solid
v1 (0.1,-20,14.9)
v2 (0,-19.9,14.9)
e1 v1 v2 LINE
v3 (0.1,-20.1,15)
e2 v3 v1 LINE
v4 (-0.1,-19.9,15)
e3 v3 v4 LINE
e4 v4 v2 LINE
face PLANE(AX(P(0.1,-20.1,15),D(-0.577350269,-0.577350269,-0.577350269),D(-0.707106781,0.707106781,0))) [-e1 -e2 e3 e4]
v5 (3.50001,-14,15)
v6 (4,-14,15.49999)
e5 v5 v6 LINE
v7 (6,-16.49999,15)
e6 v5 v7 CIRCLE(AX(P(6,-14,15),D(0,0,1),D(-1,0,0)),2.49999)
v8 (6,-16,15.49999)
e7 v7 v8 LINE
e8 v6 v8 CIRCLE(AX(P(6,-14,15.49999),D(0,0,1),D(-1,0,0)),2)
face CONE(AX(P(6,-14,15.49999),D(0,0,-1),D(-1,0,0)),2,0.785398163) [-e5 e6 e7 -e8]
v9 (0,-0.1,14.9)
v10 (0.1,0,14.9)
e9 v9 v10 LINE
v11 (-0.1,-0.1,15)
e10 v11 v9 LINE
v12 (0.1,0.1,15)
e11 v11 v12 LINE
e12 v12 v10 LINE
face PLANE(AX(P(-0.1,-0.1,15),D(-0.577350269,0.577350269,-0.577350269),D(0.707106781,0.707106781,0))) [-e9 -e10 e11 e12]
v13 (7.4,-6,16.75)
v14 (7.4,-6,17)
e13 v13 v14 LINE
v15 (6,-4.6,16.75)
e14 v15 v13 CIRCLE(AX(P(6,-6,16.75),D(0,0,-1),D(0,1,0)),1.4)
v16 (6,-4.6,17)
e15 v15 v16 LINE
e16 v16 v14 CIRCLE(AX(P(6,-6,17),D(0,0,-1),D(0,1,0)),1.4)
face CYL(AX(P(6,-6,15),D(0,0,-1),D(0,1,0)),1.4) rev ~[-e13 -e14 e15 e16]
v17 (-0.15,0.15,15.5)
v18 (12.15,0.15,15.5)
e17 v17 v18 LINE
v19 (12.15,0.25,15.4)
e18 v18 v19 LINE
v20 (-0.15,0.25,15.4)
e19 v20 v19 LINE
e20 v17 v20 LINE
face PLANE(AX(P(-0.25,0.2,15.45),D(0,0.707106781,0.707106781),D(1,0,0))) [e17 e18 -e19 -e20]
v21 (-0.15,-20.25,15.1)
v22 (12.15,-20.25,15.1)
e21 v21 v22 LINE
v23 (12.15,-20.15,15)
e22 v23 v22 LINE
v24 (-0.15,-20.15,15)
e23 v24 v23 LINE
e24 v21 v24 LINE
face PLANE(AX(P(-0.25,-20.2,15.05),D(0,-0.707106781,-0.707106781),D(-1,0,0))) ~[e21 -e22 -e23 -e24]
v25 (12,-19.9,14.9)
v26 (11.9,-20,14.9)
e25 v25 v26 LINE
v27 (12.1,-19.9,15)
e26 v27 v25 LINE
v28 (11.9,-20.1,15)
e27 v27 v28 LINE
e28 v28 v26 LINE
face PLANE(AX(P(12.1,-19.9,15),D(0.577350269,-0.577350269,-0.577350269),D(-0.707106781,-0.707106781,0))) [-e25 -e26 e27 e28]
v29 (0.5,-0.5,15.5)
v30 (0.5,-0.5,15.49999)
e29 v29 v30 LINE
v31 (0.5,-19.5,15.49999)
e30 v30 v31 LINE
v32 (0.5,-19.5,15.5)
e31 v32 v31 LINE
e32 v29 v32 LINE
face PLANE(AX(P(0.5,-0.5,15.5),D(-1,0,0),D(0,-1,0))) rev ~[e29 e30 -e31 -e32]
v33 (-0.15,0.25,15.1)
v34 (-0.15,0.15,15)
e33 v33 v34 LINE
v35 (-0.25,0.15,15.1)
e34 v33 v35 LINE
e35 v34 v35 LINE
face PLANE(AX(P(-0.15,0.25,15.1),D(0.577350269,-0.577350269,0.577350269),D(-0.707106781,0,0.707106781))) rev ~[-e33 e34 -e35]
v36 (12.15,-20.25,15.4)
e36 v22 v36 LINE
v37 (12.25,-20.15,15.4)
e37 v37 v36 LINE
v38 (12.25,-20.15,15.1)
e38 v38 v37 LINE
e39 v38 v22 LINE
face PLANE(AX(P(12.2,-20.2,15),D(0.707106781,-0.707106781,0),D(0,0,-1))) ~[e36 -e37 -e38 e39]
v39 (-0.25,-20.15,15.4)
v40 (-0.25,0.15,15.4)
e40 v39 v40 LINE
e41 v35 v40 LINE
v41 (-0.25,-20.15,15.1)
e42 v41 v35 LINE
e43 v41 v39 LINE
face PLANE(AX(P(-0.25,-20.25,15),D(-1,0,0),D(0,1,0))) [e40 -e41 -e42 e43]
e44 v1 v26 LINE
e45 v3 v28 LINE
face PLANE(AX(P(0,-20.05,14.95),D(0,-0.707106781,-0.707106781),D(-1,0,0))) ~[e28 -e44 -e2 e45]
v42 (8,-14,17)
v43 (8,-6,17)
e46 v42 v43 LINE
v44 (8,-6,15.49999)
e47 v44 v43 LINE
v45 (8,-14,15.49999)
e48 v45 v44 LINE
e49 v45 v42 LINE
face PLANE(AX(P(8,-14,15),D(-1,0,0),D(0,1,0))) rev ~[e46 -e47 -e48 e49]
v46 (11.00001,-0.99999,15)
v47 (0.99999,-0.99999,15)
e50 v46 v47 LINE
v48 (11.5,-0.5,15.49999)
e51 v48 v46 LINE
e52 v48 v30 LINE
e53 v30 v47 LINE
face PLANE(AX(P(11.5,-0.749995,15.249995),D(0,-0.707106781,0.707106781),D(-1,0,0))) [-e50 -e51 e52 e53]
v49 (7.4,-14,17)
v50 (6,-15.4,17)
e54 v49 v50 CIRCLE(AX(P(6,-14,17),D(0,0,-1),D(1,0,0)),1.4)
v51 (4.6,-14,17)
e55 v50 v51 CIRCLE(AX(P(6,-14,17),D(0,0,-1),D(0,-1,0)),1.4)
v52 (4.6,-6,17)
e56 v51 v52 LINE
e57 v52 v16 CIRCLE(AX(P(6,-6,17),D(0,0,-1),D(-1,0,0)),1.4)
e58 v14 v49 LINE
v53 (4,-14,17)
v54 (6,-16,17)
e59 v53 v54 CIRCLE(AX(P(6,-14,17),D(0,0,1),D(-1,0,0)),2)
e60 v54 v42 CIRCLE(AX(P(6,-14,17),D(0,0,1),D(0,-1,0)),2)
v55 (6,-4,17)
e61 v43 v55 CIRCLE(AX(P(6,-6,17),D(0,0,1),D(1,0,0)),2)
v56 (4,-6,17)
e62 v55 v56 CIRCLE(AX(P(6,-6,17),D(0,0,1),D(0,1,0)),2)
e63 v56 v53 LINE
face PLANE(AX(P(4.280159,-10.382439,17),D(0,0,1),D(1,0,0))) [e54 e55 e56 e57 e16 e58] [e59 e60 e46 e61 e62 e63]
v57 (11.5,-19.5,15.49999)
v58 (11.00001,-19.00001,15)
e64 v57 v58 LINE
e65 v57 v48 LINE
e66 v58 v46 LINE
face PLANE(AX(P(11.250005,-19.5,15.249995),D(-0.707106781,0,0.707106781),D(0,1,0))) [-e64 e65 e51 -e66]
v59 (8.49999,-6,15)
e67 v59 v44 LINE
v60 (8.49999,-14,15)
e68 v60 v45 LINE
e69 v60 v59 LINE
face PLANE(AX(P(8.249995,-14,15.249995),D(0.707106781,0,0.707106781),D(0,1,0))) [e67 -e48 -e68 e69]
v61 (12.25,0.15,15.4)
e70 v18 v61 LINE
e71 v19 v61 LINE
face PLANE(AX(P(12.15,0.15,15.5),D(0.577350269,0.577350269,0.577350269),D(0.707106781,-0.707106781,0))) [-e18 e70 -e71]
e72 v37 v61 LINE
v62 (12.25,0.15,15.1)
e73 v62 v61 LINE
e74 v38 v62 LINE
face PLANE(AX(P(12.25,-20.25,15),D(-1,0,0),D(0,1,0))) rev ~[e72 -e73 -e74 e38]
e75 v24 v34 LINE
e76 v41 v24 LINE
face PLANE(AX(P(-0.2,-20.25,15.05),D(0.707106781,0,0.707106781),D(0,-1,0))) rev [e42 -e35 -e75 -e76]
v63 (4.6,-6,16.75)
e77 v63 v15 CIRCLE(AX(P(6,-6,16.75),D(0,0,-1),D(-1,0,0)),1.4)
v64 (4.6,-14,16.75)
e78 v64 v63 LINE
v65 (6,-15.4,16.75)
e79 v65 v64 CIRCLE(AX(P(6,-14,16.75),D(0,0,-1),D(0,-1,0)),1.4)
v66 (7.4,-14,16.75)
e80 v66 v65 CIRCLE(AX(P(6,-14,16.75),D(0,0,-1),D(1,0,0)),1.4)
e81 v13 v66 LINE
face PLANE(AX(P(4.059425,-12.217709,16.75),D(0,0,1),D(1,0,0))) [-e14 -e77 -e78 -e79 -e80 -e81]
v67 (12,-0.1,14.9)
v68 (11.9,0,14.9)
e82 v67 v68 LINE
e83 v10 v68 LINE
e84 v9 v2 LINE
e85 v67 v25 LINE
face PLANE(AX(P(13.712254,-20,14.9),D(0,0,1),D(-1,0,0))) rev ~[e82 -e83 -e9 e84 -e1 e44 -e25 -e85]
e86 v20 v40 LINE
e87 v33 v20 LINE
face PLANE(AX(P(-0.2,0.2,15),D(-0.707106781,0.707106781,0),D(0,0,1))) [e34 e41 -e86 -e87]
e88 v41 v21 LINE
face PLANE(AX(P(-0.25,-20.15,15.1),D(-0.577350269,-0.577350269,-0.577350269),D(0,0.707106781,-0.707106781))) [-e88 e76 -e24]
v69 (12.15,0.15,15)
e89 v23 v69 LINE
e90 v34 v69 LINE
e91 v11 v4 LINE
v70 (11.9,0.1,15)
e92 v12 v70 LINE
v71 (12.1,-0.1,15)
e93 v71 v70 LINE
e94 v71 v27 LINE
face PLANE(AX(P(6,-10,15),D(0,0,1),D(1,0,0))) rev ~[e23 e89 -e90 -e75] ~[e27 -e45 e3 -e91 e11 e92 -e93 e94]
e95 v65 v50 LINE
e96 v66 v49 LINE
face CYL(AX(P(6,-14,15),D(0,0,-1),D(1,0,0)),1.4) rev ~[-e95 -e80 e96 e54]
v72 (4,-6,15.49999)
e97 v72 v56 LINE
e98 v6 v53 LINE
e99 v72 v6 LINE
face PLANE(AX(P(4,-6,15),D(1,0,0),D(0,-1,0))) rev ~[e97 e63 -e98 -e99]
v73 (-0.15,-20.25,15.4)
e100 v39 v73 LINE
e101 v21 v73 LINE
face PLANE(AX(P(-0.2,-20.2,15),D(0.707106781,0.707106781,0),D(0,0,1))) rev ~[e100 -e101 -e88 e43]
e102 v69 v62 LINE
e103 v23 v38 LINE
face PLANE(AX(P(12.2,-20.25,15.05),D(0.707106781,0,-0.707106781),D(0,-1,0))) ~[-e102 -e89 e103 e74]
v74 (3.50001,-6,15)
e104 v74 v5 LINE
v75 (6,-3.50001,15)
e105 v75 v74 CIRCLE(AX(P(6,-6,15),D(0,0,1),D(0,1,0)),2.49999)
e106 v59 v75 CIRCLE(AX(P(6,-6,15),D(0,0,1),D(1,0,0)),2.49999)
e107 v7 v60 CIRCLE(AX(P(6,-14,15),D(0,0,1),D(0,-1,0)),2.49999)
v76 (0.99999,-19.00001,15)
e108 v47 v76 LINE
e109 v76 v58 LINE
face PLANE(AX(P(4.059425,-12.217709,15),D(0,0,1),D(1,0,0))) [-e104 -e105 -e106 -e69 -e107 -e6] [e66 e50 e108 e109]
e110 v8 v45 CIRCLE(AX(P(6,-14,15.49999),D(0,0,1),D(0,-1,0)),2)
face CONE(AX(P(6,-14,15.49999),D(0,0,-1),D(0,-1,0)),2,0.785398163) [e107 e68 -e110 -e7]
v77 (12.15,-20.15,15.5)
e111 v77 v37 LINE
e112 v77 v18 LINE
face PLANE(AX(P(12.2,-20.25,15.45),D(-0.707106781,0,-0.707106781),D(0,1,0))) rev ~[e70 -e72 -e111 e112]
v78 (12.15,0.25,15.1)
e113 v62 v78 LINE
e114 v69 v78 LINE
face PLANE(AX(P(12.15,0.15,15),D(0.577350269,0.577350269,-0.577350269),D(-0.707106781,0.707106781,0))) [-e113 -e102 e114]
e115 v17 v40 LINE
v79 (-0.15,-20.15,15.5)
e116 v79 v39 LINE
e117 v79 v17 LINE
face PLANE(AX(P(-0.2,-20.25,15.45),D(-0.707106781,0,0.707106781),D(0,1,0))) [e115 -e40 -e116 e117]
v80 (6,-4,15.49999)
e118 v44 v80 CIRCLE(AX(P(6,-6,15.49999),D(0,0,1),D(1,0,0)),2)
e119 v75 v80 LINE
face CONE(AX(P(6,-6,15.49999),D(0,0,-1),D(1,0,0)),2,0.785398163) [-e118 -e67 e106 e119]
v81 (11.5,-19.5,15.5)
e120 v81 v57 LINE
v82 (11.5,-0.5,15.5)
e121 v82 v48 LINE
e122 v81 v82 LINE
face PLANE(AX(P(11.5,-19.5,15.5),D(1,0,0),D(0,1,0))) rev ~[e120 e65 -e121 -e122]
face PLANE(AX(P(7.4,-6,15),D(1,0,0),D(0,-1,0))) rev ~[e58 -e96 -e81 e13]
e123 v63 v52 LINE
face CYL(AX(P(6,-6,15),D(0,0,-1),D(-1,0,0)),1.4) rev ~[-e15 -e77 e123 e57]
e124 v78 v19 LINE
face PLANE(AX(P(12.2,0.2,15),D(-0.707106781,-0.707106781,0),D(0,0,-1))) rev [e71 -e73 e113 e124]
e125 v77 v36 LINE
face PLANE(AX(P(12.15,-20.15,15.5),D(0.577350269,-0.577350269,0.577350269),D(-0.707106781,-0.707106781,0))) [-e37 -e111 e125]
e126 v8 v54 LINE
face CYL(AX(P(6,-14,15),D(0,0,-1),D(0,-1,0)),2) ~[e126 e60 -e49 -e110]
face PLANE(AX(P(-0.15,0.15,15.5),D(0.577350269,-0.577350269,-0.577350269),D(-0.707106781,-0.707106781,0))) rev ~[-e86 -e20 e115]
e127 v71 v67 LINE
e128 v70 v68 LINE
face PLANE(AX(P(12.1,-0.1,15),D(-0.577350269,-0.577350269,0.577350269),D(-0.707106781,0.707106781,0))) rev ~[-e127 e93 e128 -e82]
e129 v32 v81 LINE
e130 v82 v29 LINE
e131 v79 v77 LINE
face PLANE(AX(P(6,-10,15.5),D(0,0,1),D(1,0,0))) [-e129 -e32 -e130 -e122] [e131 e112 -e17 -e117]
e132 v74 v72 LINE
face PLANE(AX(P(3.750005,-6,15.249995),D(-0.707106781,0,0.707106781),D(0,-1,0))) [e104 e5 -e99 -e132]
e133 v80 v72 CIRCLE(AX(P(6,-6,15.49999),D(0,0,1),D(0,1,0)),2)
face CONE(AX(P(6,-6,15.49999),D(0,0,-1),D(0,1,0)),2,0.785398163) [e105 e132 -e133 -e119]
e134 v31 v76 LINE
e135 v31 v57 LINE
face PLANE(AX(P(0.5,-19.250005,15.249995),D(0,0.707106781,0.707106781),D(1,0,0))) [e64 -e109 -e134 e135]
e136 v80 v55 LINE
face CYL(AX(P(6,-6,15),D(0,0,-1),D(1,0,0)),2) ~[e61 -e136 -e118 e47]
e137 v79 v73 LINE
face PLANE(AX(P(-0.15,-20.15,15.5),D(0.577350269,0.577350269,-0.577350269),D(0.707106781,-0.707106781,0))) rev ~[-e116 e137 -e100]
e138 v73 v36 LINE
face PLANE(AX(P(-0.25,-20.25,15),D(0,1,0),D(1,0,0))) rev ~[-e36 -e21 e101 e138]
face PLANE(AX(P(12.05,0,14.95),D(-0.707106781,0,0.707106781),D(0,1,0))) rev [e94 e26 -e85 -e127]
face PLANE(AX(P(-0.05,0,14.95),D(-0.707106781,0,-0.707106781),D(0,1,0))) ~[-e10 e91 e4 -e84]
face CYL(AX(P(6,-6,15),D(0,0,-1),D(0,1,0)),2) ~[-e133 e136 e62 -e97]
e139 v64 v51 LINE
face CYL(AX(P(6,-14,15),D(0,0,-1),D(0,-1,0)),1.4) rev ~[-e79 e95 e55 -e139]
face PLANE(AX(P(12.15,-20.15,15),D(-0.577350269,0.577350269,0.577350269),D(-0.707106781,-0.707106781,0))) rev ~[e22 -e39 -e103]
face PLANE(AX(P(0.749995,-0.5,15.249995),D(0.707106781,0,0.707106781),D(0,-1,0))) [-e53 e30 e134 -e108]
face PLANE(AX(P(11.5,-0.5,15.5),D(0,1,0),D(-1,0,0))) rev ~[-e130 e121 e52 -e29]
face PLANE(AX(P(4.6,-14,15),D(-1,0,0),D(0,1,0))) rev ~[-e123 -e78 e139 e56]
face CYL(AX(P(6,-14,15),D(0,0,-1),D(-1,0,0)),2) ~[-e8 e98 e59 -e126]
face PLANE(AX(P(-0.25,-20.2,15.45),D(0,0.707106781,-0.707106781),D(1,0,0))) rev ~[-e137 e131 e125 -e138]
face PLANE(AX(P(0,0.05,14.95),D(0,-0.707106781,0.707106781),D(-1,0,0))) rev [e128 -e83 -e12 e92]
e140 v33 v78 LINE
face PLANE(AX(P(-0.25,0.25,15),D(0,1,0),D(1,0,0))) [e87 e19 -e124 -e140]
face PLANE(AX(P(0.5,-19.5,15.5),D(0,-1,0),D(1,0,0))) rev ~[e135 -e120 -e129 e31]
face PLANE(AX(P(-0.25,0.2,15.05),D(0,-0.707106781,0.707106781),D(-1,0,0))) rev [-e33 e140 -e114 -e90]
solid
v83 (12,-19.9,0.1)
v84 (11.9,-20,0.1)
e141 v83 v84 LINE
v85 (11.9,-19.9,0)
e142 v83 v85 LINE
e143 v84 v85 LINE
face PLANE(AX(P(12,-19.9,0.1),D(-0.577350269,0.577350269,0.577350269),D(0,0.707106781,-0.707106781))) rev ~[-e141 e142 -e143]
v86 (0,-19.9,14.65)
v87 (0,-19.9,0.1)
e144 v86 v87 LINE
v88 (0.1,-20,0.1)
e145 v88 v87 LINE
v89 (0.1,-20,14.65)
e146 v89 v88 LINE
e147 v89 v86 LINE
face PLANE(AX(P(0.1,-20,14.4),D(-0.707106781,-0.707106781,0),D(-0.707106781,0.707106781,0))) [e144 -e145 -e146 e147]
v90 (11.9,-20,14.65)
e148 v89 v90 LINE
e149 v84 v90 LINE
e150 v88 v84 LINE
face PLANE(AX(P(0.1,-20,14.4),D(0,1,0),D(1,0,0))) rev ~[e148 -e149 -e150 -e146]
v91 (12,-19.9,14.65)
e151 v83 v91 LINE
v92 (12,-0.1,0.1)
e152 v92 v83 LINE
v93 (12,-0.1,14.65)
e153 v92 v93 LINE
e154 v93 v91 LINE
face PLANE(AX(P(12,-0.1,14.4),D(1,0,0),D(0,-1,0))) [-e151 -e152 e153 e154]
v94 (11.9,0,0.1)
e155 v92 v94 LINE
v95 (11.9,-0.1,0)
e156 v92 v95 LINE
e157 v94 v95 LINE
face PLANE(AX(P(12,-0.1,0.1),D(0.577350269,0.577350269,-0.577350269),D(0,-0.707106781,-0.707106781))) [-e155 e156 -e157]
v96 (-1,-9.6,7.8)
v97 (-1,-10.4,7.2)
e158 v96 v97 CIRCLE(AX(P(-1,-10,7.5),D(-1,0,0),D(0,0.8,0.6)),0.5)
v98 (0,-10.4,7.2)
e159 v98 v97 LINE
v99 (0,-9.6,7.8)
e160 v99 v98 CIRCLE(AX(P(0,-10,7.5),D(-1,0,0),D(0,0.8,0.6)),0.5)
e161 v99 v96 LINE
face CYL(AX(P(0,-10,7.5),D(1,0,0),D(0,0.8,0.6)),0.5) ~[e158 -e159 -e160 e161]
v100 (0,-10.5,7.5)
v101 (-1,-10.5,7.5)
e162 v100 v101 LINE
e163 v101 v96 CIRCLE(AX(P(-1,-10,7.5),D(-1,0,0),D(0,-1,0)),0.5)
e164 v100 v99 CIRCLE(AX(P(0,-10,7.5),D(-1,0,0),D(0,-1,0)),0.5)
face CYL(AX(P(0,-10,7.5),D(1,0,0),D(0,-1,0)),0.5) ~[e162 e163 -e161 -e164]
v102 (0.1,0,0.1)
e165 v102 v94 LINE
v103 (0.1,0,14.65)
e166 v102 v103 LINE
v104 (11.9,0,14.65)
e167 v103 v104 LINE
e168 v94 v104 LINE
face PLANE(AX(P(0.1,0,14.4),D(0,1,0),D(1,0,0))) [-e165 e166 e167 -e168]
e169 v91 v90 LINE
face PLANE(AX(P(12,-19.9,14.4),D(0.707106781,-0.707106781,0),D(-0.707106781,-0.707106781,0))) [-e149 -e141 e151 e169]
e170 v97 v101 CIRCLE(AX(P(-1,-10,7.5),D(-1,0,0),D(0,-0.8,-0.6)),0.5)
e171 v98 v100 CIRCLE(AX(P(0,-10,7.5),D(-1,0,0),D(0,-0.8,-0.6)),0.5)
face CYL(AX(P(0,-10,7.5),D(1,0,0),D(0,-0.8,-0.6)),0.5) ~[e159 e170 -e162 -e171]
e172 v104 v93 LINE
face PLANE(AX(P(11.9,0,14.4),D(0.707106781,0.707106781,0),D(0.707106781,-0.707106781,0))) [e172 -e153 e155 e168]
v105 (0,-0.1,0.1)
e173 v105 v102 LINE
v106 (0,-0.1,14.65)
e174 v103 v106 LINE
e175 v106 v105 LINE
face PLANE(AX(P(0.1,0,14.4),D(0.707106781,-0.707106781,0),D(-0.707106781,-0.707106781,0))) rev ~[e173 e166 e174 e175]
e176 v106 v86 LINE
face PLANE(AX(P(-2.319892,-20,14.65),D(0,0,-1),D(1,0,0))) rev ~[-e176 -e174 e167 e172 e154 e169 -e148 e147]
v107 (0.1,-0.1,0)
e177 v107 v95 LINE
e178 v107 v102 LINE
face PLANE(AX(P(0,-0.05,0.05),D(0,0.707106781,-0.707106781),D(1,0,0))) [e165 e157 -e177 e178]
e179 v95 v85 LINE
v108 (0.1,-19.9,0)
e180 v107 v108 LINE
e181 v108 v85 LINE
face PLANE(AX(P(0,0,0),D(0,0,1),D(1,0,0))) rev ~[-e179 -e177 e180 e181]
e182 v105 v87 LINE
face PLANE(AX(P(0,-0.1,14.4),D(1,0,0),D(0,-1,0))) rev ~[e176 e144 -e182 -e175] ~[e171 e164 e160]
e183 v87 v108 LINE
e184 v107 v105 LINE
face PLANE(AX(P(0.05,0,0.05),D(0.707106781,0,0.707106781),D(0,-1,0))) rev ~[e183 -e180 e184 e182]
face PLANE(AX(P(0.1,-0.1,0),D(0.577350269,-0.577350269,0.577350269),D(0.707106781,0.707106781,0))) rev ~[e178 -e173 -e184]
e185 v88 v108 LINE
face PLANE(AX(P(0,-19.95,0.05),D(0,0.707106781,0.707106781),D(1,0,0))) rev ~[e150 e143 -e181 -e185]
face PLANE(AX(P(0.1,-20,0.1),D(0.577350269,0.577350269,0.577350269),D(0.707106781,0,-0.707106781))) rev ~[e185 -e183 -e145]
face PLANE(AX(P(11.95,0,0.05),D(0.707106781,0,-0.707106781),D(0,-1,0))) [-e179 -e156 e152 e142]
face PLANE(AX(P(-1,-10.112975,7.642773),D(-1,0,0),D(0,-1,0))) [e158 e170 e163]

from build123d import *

# Parameters (mm, degrees)
F0_W      = 12
F0_H      = 15
F1_DEPTH  = 20
F3_DEPTH  = 1
F4_W      = 12.5
F4_H      = 20.5
F4_W_2    = 12
F4_H_2    = 20
F5_DEPTH  = 0.5
F7_DEPTH  = 0.5
F9_DEPTH  = 2
F10_DEPTH = 1.75
F11_SIZE  = 0.1
F12_SIZE  = 0.49999
F13_W     = 2.4198924027
F13_H     = 0.5
F13_W_2   = 11.8
F13_W_3   = 1.8122543529
F14_DEPTH = 25
F15_DEPTH = 0.25


# Not quite as in the source:
# - a fillet or chamfer is up to 0.001 mm smaller than in the source, because OpenCascade refuses the exact size


with BuildPart() as f1:
    # F0 (on Front) → F1 (new body)
    with BuildSketch(Plane.XZ):
        with Locations((6, 7.5)):
            Rectangle(F0_W, F0_H)
    extrude(amount=F1_DEPTH)

    # F2 (on face) → F3 (join)
    with BuildSketch(Plane(origin=(0, 0, 0), x_dir=(0, -1, 0), z_dir=(-1, 0, 0))):
        with BuildLine():
            ThreePointArc((10.5, 7.5), (10.158113883, 7.974341649), (9.6, 7.8))
            Line((9.6, 7.8), (10.4, 7.2))
            ThreePointArc((10.4, 7.2), (10.474341649, 7.341886117), (10.5, 7.5))
        make_face()
        with BuildLine():
            Line((10.4, 7.2), (9.6, 7.8))
            ThreePointArc((9.6, 7.8), (9.7, 7.1), (10.4, 7.2))
        make_face()
    extrude(amount=F3_DEPTH)

    # F4 (on face) → F5 (join)
    with BuildSketch(Plane.XY.offset(15)):
        with Locations((6, -10)):
            Rectangle(F4_W, F4_H)
        with Locations((6, -10)):
            Rectangle(F4_W_2, F4_H_2, mode=Mode.SUBTRACT)
        Polygon((12, 0), (0, 0), (12, -20), align=None)
        Polygon((12, -20), (0, 0), (0, -20), align=None)
    extrude(amount=F5_DEPTH)

    # F6 (on face) → F7 (cut)
    with BuildSketch(Plane.XY.offset(15.5)):
        Polygon((11.5, -19.02), (0.5, -0.98), (0.5, -19.5), (11.5, -19.5), align=None)
        Polygon((0.5, -0.5), (0.5, -0.98), (11.5, -19.02), (11.5, -0.5), align=None)
    extrude(amount=-F7_DEPTH, mode=Mode.SUBTRACT)

    # F8 (on face) → F9 (join)
    with BuildSketch(Plane.XY.offset(15)):
        Polygon((4.6, -7.5818181818), (4, -6.5454545455), (4, -14), (4.6, -14), align=None)
        Polygon((4, -6), (4, -6.5454545455), (4.6, -7.5818181818), (4.6, -6), align=None)
        with BuildLine():
            ThreePointArc((6, -4), (4.5857864376, -4.5857864376), (4, -6))
            Line((4, -6), (4.6, -6))
            Line((4.6, -6), (4.6, -4.6))
            Line((4.6, -4.6), (6, -4.6))
            Line((6, -4.6), (7.4, -4.6))
            Line((7.4, -4.6), (7.4, -6))
            Line((7.4, -6), (8, -6))
            ThreePointArc((8, -6), (7.4142135624, -4.5857864376), (6, -4))
        make_face()
        with BuildLine():
            Line((4.6, -4.6), (4.6, -6))
            ThreePointArc((4.6, -6), (5.0100505063, -5.0100505063), (6, -4.6))
            Line((6, -4.6), (4.6, -4.6))
        make_face()
        with BuildLine():
            ThreePointArc((6, -4.6), (6.9899494937, -5.0100505063), (7.4, -6))
            Line((7.4, -6), (7.4, -4.6))
            Line((7.4, -4.6), (6, -4.6))
        make_face()
        Polygon((7.4, -6), (7.4, -12.4181818182), (8, -13.4545454545), (8, -6), align=None)
        Polygon((8, -13.4545454545), (7.4, -12.4181818182), (7.4, -14), (8, -14), align=None)
        with BuildLine():
            Line((4.6, -14), (4, -14))
            ThreePointArc((4, -14), (4.5857864376, -15.4142135624), (6, -16))
            ThreePointArc((6, -16), (7.4142135624, -15.4142135624), (8, -14))
            Line((8, -14), (7.4, -14))
            Line((7.4, -14), (7.4, -15.4))
            Line((7.4, -15.4), (6, -15.4))
            Line((6, -15.4), (4.6, -15.4))
            Line((4.6, -15.4), (4.6, -14))
        make_face()
        with BuildLine():
            Line((7.4, -15.4), (7.4, -14))
            ThreePointArc((7.4, -14), (6.9899494937, -14.9899494937), (6, -15.4))
            Line((6, -15.4), (7.4, -15.4))
        make_face()
        with BuildLine():
            ThreePointArc((6, -15.4), (5.0100505063, -14.9899494937), (4.6, -14))
            Line((4.6, -14), (4.6, -15.4))
            Line((4.6, -15.4), (6, -15.4))
        make_face()
    extrude(amount=F9_DEPTH)

    # F10 (add): a face of the model
    f10_faces = [f1.faces().sort_by_distance(p)[0] for p in [
        (6, -10, 15),
    ]]
    extrude(f10_faces, amount=F10_DEPTH)

    # F11
    f11_edges = [f1.edges().sort_by_distance(p)[0] for p in [
        (0, 0, 7.5),
        (0, -10, 0),
        (6, 0, 0),
        (0, -20, 7.5),
        (6, -20, 0),
        (12, -20, 7.5),
        (12, 0, 7.5),
        (12, -10, 0),
        (12.25, -20.25, 15.25),
        (12.25, 0.25, 15.25),
        (12.25, -10, 15),
        (12, -10, 15),
        (6, -20, 15),
        (6, -20.25, 15),
        (0, -10, 15),
        (-0.25, -20.25, 15.25),
        (-0.25, -10, 15),
        (6, 0.25, 15),
        (-0.25, 0.25, 15.25),
        (6, 0.25, 15.5),
        (-0.25, -10, 15.5),
        (12.25, -10, 15.5),
        (6, -20.25, 15.5),
        (6, 0, 15),
    ]]
    chamfer(f11_edges, length=F11_SIZE)

    # F12 (size 0.5 in the source; OpenCascade refuses exactly that, so slightly less here)
    f12_edges = [f1.edges().sort_by_distance(p)[0] for p in [
        (0.5, -10, 15),
        (6, -0.5, 15),
        (11.5, -10, 15),
        (6, -19.5, 15),
        (8, -10, 15),
        (6, -4, 15),
        (4, -10, 15),
        (6, -16, 15),
    ]]
    chamfer(f12_edges, length=F12_SIZE)

    # F13 (on face) → F14 (cut)
    with BuildSketch(Plane.XZ.offset(20)):
        with Locations((-1.1099462014, 14.65)):
            Rectangle(F13_W, F13_H)
        with Locations((6, 14.65)):
            Rectangle(F13_W_2, F13_H)
        with Locations((12.8061271764, 14.65)):
            Rectangle(F13_W_3, F13_H)
    extrude(amount=-F14_DEPTH, mode=Mode.SUBTRACT)

    # F15 (add): a face of the model
    f15_faces = [f1.faces().sort_by_distance(p)[0] for p in [
        (6, -10, 14.4),
    ]]
    extrude(f15_faces, amount=F15_DEPTH)


solid = f1.part
